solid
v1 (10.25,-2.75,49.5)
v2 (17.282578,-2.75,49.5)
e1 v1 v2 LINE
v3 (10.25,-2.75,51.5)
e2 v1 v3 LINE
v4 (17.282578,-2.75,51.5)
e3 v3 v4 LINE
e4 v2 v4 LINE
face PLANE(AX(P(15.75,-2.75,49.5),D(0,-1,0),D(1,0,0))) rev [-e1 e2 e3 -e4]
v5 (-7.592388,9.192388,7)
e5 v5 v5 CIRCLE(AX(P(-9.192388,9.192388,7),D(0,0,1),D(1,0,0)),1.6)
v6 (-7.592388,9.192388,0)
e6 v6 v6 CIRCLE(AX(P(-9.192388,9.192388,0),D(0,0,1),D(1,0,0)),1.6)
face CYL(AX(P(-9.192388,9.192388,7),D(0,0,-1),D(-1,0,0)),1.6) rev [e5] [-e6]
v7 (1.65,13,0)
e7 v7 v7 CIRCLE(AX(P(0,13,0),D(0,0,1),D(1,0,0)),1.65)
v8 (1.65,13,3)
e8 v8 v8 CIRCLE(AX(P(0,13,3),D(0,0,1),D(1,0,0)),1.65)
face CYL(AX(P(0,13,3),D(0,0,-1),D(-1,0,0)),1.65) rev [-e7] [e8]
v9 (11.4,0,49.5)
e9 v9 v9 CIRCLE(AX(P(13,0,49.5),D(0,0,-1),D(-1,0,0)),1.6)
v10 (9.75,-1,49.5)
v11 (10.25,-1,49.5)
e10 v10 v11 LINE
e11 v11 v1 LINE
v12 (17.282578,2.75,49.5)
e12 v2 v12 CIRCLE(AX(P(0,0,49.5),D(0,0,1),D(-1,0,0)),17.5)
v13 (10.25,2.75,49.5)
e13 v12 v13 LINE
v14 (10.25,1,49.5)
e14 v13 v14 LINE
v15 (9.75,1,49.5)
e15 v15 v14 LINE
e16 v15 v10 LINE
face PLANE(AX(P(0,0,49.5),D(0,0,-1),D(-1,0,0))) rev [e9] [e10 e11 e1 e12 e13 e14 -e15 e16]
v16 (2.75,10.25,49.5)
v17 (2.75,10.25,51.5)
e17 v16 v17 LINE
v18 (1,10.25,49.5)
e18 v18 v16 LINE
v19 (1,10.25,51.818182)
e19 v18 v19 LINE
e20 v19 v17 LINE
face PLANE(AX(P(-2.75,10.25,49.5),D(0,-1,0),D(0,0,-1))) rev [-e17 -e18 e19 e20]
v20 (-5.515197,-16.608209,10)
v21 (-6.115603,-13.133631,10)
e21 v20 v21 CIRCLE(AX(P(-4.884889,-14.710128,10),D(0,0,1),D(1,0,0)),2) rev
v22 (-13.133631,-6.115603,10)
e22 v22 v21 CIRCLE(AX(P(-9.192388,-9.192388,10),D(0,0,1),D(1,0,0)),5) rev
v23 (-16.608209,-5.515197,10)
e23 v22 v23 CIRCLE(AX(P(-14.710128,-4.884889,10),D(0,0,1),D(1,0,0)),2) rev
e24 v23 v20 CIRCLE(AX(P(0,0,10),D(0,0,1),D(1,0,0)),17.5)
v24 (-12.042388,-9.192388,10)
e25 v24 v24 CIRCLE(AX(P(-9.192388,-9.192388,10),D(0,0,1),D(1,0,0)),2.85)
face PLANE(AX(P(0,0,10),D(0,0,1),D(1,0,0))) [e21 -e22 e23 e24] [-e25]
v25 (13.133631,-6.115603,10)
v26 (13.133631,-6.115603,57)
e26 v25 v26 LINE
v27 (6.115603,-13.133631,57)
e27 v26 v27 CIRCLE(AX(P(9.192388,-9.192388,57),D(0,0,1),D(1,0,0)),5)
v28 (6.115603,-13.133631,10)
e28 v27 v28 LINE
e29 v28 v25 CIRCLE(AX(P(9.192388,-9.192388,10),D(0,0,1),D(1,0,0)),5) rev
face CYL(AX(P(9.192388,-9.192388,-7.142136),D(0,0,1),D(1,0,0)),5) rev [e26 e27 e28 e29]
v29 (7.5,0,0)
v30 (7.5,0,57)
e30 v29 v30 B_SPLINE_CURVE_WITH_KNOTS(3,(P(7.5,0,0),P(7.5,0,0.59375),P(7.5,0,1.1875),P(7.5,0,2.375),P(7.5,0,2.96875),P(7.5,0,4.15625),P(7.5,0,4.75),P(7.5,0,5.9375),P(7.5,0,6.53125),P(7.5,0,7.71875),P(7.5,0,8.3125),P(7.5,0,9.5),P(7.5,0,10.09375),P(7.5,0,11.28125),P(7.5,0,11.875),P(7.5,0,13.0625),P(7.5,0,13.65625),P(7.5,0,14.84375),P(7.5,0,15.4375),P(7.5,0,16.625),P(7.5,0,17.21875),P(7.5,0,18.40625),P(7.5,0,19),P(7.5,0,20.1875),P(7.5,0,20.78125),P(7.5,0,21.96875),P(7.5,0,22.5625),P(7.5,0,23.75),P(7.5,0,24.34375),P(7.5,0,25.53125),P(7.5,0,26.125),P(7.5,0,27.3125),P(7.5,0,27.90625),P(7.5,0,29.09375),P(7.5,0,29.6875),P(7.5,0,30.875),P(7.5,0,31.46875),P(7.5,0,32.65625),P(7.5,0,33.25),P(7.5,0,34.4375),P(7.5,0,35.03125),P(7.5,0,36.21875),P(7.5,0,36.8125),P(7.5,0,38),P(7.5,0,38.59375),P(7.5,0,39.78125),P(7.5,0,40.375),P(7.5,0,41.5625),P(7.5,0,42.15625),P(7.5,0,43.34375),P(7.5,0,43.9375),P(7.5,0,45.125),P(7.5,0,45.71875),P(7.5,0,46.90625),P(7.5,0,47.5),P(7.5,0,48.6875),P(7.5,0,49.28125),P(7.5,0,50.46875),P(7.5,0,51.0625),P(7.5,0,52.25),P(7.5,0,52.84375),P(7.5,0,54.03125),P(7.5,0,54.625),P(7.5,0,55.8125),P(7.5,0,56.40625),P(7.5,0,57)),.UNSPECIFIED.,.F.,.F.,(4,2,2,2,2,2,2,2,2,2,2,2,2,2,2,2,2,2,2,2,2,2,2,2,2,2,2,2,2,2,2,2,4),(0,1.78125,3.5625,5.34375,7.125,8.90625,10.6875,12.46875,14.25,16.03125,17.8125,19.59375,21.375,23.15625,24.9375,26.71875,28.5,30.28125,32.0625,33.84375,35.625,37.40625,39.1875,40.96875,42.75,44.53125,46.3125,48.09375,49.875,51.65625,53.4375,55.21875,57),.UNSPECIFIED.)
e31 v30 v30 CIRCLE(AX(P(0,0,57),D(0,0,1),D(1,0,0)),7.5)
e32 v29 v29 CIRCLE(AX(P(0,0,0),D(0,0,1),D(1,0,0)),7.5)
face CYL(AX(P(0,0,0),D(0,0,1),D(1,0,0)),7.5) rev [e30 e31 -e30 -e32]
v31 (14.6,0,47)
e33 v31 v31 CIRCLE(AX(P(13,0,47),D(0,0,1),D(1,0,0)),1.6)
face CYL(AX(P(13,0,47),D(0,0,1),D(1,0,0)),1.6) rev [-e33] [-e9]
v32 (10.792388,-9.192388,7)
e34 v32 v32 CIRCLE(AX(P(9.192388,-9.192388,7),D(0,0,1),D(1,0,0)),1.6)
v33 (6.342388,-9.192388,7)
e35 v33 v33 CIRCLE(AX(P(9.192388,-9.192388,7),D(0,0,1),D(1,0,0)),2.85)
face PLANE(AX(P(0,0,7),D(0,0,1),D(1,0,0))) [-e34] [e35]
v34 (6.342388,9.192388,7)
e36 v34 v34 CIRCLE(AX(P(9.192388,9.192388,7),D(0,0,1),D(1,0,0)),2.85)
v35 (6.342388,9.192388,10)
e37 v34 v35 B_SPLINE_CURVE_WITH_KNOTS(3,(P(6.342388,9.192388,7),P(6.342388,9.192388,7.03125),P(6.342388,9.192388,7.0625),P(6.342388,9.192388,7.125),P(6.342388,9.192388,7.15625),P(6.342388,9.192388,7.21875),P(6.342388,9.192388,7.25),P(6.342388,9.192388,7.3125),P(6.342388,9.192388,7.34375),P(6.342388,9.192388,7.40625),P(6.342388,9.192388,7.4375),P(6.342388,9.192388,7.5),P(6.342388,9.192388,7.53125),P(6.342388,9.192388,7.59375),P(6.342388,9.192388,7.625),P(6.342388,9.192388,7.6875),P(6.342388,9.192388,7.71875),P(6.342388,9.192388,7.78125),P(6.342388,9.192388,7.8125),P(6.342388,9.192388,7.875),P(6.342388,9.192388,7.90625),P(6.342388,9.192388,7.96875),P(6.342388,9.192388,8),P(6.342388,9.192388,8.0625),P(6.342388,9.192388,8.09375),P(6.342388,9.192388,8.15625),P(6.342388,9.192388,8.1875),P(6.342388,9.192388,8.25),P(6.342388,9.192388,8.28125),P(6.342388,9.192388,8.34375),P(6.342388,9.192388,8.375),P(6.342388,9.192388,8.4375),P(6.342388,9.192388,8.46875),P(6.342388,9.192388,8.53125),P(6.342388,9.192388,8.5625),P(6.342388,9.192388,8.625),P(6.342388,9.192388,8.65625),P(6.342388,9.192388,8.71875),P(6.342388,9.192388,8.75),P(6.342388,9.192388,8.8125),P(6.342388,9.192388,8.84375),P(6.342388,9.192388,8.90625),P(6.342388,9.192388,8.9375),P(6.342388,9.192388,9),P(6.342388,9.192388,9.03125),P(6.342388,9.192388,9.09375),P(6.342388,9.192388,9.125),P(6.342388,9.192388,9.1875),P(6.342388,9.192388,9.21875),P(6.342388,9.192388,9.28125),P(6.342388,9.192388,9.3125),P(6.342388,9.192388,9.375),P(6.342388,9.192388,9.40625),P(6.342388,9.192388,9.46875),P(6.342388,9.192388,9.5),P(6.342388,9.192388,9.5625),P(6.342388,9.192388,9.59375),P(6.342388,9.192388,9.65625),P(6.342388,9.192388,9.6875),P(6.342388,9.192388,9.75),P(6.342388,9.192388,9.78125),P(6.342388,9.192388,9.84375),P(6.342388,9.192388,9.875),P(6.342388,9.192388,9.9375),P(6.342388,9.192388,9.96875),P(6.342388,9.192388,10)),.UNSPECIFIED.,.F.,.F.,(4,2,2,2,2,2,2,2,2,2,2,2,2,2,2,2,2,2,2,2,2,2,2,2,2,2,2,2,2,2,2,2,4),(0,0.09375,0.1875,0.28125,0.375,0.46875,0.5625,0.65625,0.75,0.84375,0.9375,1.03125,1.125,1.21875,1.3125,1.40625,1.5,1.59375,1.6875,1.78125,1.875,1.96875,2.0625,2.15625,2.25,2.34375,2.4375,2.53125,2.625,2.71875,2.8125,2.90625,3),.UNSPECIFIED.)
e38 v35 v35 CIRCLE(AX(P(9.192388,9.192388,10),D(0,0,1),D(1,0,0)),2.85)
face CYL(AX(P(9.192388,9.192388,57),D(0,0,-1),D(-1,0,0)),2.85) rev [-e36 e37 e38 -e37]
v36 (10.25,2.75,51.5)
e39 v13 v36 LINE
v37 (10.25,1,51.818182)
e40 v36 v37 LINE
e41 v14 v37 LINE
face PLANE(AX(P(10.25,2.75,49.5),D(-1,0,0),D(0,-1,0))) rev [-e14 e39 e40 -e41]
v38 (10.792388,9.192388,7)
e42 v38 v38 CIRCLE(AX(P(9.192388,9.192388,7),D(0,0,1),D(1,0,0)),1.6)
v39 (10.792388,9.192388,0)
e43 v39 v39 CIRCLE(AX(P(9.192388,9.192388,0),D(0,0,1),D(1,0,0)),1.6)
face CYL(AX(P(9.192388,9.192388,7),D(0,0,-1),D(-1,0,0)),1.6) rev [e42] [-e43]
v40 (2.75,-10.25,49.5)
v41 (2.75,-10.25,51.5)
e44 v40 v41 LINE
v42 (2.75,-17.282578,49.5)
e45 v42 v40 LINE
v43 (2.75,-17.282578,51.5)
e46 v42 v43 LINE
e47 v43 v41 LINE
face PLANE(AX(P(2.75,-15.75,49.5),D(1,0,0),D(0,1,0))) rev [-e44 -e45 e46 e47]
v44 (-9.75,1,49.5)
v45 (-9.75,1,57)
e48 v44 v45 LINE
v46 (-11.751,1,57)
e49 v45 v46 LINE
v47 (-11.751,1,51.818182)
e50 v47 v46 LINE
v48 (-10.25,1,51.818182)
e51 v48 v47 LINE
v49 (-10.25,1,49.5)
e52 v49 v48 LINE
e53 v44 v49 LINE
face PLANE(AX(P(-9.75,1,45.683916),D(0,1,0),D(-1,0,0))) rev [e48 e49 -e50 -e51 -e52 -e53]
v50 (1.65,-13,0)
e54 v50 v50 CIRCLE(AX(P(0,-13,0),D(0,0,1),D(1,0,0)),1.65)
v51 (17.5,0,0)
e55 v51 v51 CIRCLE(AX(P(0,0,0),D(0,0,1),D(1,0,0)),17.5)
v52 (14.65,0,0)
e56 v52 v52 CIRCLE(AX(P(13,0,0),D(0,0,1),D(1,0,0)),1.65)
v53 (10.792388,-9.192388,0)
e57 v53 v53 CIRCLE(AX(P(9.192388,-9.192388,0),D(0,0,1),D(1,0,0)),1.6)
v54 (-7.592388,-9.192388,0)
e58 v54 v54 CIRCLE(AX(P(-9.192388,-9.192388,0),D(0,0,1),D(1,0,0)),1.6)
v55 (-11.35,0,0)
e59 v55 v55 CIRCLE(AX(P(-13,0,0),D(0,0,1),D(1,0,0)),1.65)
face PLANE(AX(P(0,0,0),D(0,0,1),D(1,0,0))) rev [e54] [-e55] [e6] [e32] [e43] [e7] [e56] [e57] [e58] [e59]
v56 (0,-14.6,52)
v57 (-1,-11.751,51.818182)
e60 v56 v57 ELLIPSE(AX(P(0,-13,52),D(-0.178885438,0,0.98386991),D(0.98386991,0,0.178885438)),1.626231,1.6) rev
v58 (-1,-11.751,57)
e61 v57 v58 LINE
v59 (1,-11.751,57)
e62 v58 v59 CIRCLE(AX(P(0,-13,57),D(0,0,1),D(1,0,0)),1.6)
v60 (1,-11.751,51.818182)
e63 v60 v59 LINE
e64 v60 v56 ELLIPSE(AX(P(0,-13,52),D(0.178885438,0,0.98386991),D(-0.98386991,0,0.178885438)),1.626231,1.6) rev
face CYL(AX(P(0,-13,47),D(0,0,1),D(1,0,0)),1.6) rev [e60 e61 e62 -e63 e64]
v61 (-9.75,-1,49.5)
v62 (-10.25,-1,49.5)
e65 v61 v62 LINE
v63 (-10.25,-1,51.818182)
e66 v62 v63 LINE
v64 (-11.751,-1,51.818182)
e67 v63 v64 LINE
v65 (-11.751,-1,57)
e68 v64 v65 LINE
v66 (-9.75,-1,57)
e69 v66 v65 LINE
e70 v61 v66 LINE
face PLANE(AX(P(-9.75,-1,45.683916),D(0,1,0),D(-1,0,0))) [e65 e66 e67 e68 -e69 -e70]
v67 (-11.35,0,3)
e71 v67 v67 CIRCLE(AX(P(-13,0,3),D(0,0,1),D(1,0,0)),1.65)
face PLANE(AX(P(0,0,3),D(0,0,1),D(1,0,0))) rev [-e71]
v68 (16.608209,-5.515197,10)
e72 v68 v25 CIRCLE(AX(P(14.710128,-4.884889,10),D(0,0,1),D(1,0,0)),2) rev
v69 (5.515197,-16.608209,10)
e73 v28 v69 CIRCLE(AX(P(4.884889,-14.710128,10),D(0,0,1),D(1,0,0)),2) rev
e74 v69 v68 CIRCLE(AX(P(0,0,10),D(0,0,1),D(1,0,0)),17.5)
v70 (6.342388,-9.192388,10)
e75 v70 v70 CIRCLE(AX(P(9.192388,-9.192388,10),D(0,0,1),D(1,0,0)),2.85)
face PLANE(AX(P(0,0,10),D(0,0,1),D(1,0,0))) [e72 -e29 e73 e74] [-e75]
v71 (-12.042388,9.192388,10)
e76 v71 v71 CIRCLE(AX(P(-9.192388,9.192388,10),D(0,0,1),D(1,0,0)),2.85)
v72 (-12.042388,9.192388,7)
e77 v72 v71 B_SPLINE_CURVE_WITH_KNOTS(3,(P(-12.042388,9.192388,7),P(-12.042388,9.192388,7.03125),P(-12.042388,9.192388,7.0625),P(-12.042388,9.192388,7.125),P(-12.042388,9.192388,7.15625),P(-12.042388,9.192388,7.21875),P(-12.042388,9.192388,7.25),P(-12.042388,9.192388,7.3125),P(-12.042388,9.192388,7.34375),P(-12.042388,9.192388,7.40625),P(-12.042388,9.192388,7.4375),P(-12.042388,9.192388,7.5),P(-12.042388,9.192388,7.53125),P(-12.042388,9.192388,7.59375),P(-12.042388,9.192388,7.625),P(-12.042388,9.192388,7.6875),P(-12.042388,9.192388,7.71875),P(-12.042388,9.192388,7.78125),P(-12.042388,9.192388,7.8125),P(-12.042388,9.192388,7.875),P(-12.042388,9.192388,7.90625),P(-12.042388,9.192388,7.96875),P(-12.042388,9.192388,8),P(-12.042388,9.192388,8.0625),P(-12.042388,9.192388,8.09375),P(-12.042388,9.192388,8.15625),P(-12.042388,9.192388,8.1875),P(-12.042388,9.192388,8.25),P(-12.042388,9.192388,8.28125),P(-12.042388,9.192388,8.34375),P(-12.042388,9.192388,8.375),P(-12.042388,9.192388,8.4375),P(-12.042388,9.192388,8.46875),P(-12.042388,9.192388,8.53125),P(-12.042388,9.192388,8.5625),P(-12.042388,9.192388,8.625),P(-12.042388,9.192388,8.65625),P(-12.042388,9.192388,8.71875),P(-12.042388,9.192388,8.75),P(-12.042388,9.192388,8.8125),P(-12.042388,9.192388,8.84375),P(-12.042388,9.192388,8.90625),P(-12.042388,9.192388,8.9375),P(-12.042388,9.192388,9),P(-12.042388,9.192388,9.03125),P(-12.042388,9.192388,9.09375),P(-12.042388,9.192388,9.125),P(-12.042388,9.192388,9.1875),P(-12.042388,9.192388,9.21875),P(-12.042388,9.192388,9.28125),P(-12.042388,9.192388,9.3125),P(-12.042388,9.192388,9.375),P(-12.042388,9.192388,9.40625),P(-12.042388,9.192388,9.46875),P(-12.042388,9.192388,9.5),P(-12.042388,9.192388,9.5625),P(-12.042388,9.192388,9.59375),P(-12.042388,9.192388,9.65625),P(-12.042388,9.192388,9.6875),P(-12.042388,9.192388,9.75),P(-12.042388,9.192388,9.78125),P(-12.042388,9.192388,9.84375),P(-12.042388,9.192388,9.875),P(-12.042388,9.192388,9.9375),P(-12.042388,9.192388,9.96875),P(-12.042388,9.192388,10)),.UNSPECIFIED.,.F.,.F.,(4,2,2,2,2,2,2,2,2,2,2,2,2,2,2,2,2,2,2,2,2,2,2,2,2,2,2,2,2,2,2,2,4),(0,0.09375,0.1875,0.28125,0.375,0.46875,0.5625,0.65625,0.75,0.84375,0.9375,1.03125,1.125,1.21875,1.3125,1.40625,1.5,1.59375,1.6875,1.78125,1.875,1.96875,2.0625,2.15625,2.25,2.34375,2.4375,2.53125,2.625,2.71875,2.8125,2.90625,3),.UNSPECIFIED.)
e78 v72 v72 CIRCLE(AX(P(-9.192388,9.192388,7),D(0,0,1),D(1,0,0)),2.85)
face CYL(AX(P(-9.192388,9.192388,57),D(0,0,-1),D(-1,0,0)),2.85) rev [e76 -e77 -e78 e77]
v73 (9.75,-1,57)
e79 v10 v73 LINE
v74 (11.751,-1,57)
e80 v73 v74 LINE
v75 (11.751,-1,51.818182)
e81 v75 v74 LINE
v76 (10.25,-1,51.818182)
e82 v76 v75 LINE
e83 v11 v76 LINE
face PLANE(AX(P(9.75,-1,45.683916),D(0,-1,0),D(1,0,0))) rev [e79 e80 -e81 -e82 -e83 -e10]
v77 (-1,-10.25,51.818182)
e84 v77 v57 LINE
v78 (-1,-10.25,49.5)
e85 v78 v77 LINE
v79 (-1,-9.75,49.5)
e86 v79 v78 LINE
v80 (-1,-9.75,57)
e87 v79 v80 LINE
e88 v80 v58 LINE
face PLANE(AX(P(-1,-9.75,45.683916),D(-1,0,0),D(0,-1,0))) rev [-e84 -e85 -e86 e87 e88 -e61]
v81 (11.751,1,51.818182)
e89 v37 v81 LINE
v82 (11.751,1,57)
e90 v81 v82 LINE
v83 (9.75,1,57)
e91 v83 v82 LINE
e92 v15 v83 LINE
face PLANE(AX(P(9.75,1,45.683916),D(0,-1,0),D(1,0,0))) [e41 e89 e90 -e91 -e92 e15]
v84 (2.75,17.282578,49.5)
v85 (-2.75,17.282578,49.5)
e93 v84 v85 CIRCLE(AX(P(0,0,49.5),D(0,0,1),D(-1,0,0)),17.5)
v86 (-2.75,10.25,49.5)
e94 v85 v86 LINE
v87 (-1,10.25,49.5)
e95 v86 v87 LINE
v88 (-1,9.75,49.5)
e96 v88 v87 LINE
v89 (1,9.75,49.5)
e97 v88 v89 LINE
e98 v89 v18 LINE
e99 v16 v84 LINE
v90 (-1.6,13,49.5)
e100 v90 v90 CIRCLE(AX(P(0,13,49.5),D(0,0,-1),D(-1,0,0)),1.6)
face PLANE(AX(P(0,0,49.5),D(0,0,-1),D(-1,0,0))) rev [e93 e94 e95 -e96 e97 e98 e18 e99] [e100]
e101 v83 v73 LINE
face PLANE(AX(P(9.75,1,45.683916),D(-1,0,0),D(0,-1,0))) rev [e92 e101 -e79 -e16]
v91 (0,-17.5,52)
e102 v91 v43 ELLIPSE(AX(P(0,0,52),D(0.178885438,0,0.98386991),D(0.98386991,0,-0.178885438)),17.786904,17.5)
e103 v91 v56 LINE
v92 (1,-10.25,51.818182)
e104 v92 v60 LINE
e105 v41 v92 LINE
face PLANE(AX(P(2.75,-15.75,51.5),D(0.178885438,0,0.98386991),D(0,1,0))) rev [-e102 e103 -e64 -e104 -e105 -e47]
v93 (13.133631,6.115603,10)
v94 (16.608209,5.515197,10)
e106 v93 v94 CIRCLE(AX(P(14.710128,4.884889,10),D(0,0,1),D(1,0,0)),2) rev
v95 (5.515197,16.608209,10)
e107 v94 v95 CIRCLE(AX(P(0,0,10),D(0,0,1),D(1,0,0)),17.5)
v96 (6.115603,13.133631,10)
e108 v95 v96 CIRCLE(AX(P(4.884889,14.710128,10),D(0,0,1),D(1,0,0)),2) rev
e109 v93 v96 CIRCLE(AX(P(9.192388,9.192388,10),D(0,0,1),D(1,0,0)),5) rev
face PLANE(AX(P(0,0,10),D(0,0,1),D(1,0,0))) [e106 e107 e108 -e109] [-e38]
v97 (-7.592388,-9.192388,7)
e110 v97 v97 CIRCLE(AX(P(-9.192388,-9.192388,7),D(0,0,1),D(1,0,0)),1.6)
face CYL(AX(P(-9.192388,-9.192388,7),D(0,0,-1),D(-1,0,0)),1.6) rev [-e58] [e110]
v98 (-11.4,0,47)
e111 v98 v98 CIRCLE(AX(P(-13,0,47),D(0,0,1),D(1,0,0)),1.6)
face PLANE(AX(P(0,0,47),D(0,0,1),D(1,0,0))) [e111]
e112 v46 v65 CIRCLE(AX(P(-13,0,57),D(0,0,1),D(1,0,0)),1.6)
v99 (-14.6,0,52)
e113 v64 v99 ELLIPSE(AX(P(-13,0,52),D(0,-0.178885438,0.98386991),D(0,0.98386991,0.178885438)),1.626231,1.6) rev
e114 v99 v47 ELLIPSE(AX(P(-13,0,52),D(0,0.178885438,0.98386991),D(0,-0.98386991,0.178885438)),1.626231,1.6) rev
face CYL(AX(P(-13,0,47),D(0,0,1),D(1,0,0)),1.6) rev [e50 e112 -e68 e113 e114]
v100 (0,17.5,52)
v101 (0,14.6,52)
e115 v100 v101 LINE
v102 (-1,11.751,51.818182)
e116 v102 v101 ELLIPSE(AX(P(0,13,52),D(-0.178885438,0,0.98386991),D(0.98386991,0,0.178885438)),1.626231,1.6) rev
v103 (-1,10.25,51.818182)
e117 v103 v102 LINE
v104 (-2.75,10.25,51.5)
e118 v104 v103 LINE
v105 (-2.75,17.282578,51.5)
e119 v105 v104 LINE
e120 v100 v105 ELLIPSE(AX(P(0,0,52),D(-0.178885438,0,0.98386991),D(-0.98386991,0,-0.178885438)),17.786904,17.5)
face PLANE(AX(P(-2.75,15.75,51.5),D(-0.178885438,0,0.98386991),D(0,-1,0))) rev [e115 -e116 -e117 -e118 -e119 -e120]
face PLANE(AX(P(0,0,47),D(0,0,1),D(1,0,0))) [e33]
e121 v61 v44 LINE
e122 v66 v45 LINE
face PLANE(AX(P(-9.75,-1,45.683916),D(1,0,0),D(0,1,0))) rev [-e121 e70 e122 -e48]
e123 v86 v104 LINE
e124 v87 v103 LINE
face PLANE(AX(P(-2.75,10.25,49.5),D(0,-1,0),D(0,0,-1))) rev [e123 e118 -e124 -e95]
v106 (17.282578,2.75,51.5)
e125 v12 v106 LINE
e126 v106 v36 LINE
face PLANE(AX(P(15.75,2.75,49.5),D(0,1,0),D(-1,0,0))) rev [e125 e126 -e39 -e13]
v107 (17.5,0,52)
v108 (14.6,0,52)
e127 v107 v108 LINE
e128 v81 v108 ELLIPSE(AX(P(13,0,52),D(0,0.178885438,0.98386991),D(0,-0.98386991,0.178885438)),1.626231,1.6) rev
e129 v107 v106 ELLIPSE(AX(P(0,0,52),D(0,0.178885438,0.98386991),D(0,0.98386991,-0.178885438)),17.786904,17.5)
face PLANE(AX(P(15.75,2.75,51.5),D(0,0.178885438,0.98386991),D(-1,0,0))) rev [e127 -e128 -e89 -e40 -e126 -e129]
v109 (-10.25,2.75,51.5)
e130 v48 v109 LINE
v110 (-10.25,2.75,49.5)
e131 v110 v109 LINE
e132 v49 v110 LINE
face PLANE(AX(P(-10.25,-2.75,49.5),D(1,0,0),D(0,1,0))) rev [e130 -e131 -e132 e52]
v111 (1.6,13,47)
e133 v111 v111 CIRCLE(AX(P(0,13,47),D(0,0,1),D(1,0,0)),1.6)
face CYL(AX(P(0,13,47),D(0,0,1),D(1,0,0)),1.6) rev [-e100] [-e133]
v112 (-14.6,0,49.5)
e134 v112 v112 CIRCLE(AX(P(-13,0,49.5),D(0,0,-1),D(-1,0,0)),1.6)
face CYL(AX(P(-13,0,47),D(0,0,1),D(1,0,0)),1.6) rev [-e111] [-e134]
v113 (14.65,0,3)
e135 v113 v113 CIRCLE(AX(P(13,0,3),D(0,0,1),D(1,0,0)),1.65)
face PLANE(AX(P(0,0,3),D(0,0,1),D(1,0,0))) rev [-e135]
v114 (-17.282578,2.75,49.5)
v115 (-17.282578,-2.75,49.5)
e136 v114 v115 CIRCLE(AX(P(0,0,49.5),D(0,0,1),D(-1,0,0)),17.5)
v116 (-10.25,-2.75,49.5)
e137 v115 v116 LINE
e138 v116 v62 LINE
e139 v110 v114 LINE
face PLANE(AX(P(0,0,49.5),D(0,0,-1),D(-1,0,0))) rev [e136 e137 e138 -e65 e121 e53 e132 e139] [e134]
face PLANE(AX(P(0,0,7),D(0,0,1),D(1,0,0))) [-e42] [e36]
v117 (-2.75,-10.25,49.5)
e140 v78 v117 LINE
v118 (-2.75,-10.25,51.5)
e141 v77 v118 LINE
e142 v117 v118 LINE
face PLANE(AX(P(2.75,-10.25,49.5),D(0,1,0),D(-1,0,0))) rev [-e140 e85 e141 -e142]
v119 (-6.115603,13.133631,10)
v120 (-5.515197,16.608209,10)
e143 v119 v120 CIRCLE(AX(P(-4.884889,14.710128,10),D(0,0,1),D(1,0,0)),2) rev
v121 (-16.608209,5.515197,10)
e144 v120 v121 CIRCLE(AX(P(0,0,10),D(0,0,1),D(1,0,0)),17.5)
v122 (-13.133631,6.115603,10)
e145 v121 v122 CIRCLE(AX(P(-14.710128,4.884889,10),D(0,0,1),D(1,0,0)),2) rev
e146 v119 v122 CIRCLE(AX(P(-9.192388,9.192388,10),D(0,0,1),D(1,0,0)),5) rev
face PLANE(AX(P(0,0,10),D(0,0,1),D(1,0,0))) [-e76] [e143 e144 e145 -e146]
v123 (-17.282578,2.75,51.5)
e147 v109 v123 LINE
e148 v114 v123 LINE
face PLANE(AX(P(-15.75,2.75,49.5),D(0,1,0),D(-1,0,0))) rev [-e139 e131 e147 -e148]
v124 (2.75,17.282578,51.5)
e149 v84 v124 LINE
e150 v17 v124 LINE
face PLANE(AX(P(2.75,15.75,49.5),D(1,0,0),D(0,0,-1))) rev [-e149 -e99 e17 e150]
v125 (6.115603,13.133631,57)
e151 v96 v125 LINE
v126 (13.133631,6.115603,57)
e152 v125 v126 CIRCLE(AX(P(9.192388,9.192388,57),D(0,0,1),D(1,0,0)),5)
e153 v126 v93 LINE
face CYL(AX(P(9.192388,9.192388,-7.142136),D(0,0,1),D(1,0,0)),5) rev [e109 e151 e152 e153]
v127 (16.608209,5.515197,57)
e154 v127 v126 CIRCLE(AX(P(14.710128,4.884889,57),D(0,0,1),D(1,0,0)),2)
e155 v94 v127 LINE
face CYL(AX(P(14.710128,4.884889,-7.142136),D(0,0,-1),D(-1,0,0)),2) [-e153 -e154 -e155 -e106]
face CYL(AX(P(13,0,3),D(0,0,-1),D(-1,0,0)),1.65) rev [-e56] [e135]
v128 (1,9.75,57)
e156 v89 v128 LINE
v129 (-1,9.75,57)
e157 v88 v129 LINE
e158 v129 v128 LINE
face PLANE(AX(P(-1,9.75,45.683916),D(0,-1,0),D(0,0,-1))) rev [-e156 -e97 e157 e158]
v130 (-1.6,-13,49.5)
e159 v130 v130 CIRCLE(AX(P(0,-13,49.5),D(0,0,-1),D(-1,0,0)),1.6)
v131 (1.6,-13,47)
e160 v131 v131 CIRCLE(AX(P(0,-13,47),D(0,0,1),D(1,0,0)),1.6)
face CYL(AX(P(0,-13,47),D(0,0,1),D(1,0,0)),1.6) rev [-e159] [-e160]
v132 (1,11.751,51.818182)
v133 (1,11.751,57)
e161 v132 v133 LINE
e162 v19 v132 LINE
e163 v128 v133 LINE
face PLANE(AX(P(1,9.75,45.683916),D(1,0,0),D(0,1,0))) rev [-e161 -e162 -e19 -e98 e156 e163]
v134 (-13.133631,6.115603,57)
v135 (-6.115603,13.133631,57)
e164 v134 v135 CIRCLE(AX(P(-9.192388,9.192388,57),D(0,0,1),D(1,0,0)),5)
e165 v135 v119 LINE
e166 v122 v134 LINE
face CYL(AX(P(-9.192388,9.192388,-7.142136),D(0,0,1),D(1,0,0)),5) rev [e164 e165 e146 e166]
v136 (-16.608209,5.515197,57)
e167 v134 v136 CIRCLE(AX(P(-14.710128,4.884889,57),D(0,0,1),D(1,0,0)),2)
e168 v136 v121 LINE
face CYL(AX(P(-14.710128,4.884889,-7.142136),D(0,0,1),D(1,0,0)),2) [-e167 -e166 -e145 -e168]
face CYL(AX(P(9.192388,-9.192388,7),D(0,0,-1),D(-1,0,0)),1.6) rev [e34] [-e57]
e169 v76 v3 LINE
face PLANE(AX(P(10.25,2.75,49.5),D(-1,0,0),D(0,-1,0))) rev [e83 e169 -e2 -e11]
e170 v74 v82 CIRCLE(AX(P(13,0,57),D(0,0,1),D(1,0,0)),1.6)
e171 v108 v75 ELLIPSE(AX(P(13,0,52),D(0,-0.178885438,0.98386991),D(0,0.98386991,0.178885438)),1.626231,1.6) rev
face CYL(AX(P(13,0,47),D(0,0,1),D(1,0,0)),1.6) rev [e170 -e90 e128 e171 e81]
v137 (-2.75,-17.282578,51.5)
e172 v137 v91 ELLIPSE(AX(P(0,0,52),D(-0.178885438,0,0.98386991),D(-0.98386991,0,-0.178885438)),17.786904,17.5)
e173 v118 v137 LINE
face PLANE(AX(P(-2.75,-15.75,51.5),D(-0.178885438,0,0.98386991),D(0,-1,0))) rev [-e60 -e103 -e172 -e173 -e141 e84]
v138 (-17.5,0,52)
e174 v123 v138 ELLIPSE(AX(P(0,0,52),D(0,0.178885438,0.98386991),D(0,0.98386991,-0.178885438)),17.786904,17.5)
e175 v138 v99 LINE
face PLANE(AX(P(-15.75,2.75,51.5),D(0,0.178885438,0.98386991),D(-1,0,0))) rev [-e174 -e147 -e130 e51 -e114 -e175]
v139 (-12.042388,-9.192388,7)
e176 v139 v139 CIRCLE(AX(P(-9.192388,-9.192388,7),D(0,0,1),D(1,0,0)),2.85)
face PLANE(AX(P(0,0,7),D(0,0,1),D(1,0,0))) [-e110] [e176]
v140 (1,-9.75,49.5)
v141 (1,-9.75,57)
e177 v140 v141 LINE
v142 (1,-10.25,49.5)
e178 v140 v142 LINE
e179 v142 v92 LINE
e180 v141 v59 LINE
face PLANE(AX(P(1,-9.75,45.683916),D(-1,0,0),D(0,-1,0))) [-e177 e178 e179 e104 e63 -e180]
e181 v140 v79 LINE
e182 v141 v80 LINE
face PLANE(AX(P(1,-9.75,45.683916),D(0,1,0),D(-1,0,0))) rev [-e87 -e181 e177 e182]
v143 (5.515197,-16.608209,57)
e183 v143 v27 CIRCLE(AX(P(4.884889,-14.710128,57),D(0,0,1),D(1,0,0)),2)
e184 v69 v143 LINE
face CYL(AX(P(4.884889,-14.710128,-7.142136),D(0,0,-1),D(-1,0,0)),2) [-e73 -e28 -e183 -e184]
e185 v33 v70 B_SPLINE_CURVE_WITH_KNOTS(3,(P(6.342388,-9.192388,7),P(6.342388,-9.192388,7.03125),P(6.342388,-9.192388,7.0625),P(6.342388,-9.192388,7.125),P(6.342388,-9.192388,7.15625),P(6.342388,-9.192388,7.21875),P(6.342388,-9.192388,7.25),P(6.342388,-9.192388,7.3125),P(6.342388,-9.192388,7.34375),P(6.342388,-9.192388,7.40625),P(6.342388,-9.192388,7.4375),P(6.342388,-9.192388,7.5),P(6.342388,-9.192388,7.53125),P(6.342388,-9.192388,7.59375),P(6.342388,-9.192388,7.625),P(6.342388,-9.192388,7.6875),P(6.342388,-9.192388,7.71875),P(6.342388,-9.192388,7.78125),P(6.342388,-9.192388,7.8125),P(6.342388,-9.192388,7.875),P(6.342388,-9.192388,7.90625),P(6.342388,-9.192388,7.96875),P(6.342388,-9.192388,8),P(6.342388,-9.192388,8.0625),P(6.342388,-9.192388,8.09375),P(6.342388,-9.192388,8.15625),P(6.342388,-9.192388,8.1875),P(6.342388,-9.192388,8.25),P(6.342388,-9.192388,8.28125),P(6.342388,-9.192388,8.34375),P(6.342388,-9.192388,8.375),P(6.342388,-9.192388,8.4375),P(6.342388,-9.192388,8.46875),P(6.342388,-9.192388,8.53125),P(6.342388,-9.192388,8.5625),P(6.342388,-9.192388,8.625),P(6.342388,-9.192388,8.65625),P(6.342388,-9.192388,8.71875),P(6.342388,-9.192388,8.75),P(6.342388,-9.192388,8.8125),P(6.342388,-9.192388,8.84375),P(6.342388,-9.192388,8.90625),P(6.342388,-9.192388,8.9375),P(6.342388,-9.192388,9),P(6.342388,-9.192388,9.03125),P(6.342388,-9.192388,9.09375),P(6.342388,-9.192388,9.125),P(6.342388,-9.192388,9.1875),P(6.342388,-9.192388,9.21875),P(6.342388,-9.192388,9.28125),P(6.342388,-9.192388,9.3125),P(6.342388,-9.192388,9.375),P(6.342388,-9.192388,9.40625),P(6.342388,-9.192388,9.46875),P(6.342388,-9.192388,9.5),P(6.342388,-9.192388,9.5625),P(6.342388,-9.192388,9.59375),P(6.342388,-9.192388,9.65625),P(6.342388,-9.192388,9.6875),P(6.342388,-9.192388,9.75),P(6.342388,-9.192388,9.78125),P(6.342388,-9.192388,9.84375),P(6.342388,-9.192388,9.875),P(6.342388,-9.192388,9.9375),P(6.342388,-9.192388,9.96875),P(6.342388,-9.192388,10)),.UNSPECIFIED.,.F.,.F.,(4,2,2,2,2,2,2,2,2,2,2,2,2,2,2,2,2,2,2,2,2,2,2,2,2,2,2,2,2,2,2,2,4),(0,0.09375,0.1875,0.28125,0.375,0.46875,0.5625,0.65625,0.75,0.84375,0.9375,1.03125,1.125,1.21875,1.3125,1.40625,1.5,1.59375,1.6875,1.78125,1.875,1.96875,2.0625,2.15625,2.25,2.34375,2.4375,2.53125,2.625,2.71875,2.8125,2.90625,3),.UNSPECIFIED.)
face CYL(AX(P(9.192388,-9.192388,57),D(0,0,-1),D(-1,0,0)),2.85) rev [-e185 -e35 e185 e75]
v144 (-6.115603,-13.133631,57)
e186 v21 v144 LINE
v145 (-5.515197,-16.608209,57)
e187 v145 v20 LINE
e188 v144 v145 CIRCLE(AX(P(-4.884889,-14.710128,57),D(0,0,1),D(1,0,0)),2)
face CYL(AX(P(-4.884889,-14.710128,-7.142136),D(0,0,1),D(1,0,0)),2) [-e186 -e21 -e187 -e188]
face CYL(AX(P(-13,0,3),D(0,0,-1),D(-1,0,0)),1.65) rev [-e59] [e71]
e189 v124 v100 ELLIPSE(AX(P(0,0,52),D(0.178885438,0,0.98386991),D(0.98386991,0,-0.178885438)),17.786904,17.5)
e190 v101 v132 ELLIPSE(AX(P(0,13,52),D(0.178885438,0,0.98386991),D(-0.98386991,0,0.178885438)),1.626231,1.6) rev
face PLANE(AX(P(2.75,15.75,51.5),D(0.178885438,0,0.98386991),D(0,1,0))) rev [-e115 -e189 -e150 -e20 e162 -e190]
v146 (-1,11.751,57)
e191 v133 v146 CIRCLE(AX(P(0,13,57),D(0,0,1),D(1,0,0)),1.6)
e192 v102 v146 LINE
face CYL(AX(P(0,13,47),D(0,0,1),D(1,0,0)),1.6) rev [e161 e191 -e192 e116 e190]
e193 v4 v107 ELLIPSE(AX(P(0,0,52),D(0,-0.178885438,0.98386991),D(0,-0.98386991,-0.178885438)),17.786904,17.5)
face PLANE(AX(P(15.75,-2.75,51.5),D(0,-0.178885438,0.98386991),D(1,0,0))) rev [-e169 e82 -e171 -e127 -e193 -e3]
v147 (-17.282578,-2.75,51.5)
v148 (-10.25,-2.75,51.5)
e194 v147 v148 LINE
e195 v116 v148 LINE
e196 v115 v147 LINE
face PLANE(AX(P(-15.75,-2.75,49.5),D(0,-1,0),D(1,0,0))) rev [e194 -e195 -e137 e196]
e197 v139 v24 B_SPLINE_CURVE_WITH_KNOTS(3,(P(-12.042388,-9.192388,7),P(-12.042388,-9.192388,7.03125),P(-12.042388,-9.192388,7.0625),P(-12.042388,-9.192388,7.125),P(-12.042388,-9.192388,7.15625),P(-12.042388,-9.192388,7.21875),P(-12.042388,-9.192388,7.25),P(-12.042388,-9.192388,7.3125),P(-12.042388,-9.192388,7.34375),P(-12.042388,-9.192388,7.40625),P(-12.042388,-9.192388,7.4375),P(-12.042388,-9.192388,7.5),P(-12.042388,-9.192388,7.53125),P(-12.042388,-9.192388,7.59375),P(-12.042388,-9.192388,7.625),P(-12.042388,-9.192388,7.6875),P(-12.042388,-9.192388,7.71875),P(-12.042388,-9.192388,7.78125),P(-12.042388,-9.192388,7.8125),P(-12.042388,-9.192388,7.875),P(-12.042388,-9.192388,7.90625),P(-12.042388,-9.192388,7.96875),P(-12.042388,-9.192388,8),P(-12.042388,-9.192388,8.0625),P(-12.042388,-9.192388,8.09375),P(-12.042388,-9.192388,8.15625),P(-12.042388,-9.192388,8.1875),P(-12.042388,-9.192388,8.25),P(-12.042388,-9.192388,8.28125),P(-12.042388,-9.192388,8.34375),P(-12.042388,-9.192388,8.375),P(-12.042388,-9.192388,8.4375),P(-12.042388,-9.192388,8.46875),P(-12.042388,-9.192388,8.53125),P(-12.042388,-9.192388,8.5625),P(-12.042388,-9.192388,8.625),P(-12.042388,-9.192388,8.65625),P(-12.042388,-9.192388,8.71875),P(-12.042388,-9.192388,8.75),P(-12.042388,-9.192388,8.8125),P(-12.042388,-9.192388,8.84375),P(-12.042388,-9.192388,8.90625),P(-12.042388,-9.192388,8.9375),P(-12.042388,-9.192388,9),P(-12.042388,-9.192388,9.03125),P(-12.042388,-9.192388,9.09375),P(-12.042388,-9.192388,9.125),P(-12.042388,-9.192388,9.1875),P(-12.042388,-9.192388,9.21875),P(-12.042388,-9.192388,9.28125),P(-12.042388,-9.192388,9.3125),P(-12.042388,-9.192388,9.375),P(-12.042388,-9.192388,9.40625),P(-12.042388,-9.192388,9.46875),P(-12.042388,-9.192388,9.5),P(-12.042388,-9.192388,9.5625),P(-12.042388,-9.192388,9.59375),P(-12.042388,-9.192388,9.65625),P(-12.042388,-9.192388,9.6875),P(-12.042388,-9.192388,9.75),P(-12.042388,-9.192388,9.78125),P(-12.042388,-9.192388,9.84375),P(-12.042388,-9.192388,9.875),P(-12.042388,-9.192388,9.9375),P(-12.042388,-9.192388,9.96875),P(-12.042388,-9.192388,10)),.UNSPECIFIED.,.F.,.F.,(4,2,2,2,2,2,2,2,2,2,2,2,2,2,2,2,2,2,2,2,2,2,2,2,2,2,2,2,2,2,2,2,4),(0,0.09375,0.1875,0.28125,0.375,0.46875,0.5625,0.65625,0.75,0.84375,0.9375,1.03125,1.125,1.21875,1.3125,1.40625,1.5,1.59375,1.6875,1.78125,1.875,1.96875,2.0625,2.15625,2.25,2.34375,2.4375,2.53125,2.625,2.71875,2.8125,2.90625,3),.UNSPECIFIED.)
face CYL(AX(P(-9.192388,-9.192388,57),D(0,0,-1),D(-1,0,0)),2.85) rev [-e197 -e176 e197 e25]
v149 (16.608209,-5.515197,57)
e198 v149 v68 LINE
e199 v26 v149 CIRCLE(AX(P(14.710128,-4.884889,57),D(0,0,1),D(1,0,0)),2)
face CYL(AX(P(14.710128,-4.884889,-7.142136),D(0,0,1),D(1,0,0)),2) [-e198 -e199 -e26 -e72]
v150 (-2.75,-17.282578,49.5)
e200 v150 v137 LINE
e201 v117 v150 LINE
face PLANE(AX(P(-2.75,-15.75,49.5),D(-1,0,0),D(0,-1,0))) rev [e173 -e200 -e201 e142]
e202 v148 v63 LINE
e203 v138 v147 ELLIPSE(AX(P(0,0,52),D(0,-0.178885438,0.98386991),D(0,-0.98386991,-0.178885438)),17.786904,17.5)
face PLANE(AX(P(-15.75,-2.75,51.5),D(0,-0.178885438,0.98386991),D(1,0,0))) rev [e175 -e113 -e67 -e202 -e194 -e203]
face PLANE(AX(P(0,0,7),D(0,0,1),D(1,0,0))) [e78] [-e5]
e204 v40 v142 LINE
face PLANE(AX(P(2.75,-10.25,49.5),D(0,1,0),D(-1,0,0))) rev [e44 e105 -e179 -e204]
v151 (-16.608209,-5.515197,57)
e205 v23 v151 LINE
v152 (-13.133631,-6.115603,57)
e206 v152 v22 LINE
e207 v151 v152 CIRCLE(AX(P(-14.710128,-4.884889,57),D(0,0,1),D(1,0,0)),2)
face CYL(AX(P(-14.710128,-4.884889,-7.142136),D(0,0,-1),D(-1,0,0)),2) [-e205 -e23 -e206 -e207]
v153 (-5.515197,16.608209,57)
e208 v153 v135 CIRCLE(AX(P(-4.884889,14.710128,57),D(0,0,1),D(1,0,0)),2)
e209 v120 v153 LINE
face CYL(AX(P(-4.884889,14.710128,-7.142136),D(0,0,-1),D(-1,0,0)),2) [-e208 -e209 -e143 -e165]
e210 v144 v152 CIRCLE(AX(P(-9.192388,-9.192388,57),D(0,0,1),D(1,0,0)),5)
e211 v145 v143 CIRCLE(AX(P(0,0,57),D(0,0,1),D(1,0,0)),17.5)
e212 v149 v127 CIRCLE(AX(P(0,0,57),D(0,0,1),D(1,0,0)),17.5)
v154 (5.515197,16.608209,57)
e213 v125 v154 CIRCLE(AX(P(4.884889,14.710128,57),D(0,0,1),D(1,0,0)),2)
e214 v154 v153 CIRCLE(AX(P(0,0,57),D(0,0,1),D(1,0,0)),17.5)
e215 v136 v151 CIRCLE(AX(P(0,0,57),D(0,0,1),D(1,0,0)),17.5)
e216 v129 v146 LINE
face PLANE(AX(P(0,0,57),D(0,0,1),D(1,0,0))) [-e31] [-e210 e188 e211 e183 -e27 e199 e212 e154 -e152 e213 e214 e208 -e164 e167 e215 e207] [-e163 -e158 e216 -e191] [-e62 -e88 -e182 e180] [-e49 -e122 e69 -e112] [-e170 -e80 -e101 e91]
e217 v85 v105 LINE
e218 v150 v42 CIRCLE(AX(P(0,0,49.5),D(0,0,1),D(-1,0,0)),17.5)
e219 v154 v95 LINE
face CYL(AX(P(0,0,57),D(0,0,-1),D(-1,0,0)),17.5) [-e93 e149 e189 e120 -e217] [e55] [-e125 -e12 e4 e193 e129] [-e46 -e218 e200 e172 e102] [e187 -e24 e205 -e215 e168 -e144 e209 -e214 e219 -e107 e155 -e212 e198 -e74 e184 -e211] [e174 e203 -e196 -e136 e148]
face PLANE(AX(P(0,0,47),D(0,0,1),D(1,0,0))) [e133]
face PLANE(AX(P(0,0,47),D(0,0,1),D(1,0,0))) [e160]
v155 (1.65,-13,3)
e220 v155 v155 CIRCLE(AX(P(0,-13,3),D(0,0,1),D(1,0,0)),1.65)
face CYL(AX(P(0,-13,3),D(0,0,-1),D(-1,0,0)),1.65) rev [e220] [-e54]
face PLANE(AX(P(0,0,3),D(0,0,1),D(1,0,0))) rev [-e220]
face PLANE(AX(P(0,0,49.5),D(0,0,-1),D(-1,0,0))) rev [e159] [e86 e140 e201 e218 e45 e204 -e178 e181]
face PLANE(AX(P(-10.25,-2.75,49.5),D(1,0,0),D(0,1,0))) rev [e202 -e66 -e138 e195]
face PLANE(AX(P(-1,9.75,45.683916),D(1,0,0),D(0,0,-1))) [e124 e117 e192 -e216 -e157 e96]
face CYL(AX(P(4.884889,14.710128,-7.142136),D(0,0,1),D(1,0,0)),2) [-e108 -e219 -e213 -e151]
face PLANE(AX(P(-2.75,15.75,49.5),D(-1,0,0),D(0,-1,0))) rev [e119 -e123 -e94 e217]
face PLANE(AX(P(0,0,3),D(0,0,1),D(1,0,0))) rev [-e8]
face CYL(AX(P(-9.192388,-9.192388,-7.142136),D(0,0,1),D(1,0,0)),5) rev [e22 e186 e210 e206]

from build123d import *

# Parameters (mm, degrees)
SKETCH1_R           = 17.5
SKETCH1_R_2         = 2.85
SKETCH1_R_3         = 1.65
BOSS_EXTRUDE1_DEPTH = 57
SKETCH1_3_R         = 2.85
SKETCH1_3_R_2       = 1.6
BOSS_EXTRUDE2_DEPTH = 7
SKETCH2_R           = 5
CUT_EXTRUDE1_DEPTH  = 47
FILLET1_R           = 2
CUT_EXTRUDE2_START  = -7.5
SKETCH3_R           = 1.6
CUT_EXTRUDE2_DEPTH  = 2.5
CUT_EXTRUDE3_START  = -10
SKETCH3_2_R         = 1.6
CUT_EXTRUDE3_DEPTH  = 10
CHAMFER1_SIZE       = 2.75
CHAMFER1_SIZE_2     = 0.5
SKETCH4_R           = 7.5
CUT_EXTRUDE4_DEPTH  = 63.140968921
SKETCH1_4_R         = 1.65
CUT_EXTRUDE5_DEPTH  = 3
CUT_EXTRUDE6_REACH  = 64.141
SKETCH5_W           = 2
SKETCH5_H           = 3.25
SKETCH5_W_2         = 3.25
SKETCH5_H_2         = 2


with BuildPart() as part:
    # Sketch1 → Boss-Extrude1 (new body)
    # profile 1 of 5: a face of its own
    with BuildSketch(Plane(origin=(0, 0, 0), x_dir=(0, 1, 0), z_dir=(0, 0, 1))):
        with Locations(Location((0, 0, 0), (0, 0, 90))):
            Circle(SKETCH1_R)
        with Locations(Location((-9.192388155, 9.192388155, 0), (0, 0, 90))):
            Circle(SKETCH1_R_2, mode=Mode.SUBTRACT)
        with Locations(Location((-9.192388155, -9.192388155, 0), (0, 0, 90))):
            Circle(SKETCH1_R_2, mode=Mode.SUBTRACT)
        with Locations(Location((9.192388155, -9.192388155, 0), (0, 0, 90))):
            Circle(SKETCH1_R_2, mode=Mode.SUBTRACT)
        with Locations(Location((9.192388155, 9.192388155, 0), (0, 0, 90))):
            Circle(SKETCH1_R_2, mode=Mode.SUBTRACT)
    # profile 2 of 5: a face of its own
    with BuildSketch(Plane(origin=(0, 0, 0), x_dir=(0, 1, 0), z_dir=(0, 0, 1))):
        with Locations((0, 13)):
            Circle(SKETCH1_R_3)
    # profile 3 of 5: a face of its own
    with BuildSketch(Plane(origin=(0, 0, 0), x_dir=(0, 1, 0), z_dir=(0, 0, 1))):
        with Locations((-13, 0)):
            Circle(SKETCH1_R_3)
    # profile 4 of 5: a face of its own
    with BuildSketch(Plane(origin=(0, 0, 0), x_dir=(0, 1, 0), z_dir=(0, 0, 1))):
        with Locations((0, -13)):
            Circle(SKETCH1_R_3)
    # profile 5 of 5: a face of its own
    with BuildSketch(Plane(origin=(0, 0, 0), x_dir=(0, 1, 0), z_dir=(0, 0, 1))):
        with Locations((13, 0)):
            Circle(SKETCH1_R_3)
    extrude(amount=BOSS_EXTRUDE1_DEPTH)

    # Sketch1<3> → Boss-Extrude2 (add)
    # profile 1 of 4: a face of its own
    with BuildSketch(Plane(origin=(0, 0, 0), x_dir=(0, 1, 0), z_dir=(0, 0, 1))):
        with Locations(Location((-9.192388155, -9.192388155, 0), (0, 0, 90))):
            Circle(SKETCH1_3_R)
        with Locations(Location((-9.192388155, -9.192388155, 0), (0, 0, 270))):
            Circle(SKETCH1_3_R_2, mode=Mode.SUBTRACT)
    # profile 2 of 4: a face of its own
    with BuildSketch(Plane(origin=(0, 0, 0), x_dir=(0, 1, 0), z_dir=(0, 0, 1))):
        with Locations(Location((-9.192388155, 9.192388155, 0), (0, 0, 90))):
            Circle(SKETCH1_3_R)
        with Locations(Location((-9.192388155, 9.192388155, 0), (0, 0, 270))):
            Circle(SKETCH1_3_R_2, mode=Mode.SUBTRACT)
    # profile 3 of 4: a face of its own
    with BuildSketch(Plane(origin=(0, 0, 0), x_dir=(0, 1, 0), z_dir=(0, 0, 1))):
        with Locations(Location((9.192388155, -9.192388155, 0), (0, 0, 90))):
            Circle(SKETCH1_3_R)
        with Locations(Location((9.192388155, -9.192388155, 0), (0, 0, 270))):
            Circle(SKETCH1_3_R_2, mode=Mode.SUBTRACT)
    # profile 4 of 4: a face of its own
    with BuildSketch(Plane(origin=(0, 0, 0), x_dir=(0, 1, 0), z_dir=(0, 0, 1))):
        with Locations(Location((9.192388155, 9.192388155, 0), (0, 0, 90))):
            Circle(SKETCH1_3_R)
        with Locations(Location((9.192388155, 9.192388155, 0), (0, 0, 270))):
            Circle(SKETCH1_3_R_2, mode=Mode.SUBTRACT)
    extrude(amount=BOSS_EXTRUDE2_DEPTH)

    # Sketch2 → Cut-Extrude1 (cut)
    with BuildSketch(Plane.XY.offset(57)):
        with Locations((-9.192388155, 9.192388155)):
            Circle(SKETCH2_R)
        with Locations((9.192388155, 9.192388155)):
            Circle(SKETCH2_R)
        with Locations((9.192388155, -9.192388155)):
            Circle(SKETCH2_R)
        with Locations((-9.192388155, -9.192388155)):
            Circle(SKETCH2_R)
    extrude(amount=-CUT_EXTRUDE1_DEPTH, mode=Mode.SUBTRACT)

    # Fillet1
    fillet1_edges = [part.edges().sort_by_distance(p)[0] for p in [
        (-14.028560913, -10.46181049, 33.5),
        (-10.46181049, -14.028560913, 33.5),
        (10.46181049, -14.028560913, 33.5),
        (14.028560913, -10.46181049, 33.5),
        (14.028560913, 10.46181049, 33.5),
        (10.46181049, 14.028560913, 33.5),
        (-10.46181049, 14.028560913, 33.5),
        (-14.028560913, 10.46181049, 33.5),
    ]]
    fillet(fillet1_edges, radius=FILLET1_R)

    # Sketch3 → Cut-Extrude2 (cut)
    # profile 1 of 4: a face of its own
    with BuildSketch(Plane.XY.offset(57).offset(CUT_EXTRUDE2_START)):
        with BuildLine():
            Line((-2.75, 15.75), (-2.75, 17.282577933))
            ThreePointArc((-2.75, 17.282577933), (0, 17.5), (2.75, 17.282577933))
            Line((2.75, 17.282577933), (2.75, 15.75))
            Line((2.75, 15.75), (2.75, 10.25))
            Line((2.75, 10.25), (-2.75, 10.25))
            Line((-2.75, 10.25), (-2.75, 15.75))
        make_face()
        with Locations((0, 13)):
            Circle(SKETCH3_R, mode=Mode.SUBTRACT)
    # profile 2 of 4: a face of its own
    with BuildSketch(Plane.XY.offset(57).offset(CUT_EXTRUDE2_START)):
        with BuildLine():
            Line((15.75, -2.75), (10.25, -2.75))
            Line((10.25, -2.75), (10.25, 2.75))
            Line((10.25, 2.75), (15.75, 2.75))
            Line((15.75, 2.75), (17.282577933, 2.75))
            ThreePointArc((17.282577933, 2.75), (17.5, 0), (17.282577933, -2.75))
            Line((17.282577933, -2.75), (15.75, -2.75))
        make_face()
        with Locations((13, 0)):
            Circle(SKETCH3_R, mode=Mode.SUBTRACT)
    # profile 3 of 4: a face of its own
    with BuildSketch(Plane.XY.offset(57).offset(CUT_EXTRUDE2_START)):
        with BuildLine():
            Line((-2.75, -15.75), (-2.75, -10.25))
            Line((-2.75, -10.25), (2.75, -10.25))
            Line((2.75, -10.25), (2.75, -15.75))
            Line((2.75, -15.75), (2.75, -17.282577933))
            ThreePointArc((2.75, -17.282577933), (0, -17.5), (-2.75, -17.282577933))
            Line((-2.75, -17.282577933), (-2.75, -15.75))
        make_face()
        with Locations((0, -13)):
            Circle(SKETCH3_R, mode=Mode.SUBTRACT)
    # profile 4 of 4: a face of its own
    with BuildSketch(Plane.XY.offset(57).offset(CUT_EXTRUDE2_START)):
        with BuildLine():
            Line((-15.75, 2.75), (-10.25, 2.75))
            Line((-10.25, 2.75), (-10.25, -2.75))
            Line((-10.25, -2.75), (-15.75, -2.75))
            Line((-15.75, -2.75), (-17.282577933, -2.75))
            ThreePointArc((-17.282577933, -2.75), (-17.5, 0), (-17.282577933, 2.75))
            Line((-17.282577933, 2.75), (-15.75, 2.75))
        make_face()
        with Locations((-13, 0)):
            Circle(SKETCH3_R, mode=Mode.SUBTRACT)
    extrude(amount=CUT_EXTRUDE2_DEPTH, mode=Mode.SUBTRACT)

    # Sketch3<2> → Cut-Extrude3 (cut)
    with BuildSketch(Plane.XY.offset(57).offset(CUT_EXTRUDE3_START)):
        with Locations((-13, 0)):
            Circle(SKETCH3_2_R)
        with Locations((0, 13)):
            Circle(SKETCH3_2_R)
        with Locations((13, 0)):
            Circle(SKETCH3_2_R)
        with Locations((0, -13)):
            Circle(SKETCH3_2_R)
    extrude(amount=CUT_EXTRUDE3_DEPTH, mode=Mode.SUBTRACT)

    # Chamfer1
    # the kernel refuses this chamfer: 2.75, 0.5 mm, written as the material it adds along each edge
    with BuildSketch(Plane(origin=(-3.104266441, -2.75, 52), x_dir=(1.0355932807417332e-14, 0.9999763028084744, 0.006884317068104265), z_dir=(-1, 0, 0))) as chamfer1_piece_1_section:
        Polygon((CHAMFER1_SIZE * 0.999976302808, CHAMFER1_SIZE * 0.0068843170681), (-CHAMFER1_SIZE_2 * 0.0068843170681, CHAMFER1_SIZE_2 * 0.999976302808), (0, 0), align=None)
    chamfer1_piece_1 = extrude(amount=21.324045051, mode=Mode.PRIVATE)
    chamfer1_piece_1 = chamfer1_piece_1 & Plane(origin=(0, 0, 51.863927103), x_dir=(-1, 0, 0), z_dir=(0, 0, -1)) * Cylinder(17.5, 54, mode=Mode.PRIVATE)
    chamfer1_piece_1 = chamfer1_piece_1 - Plane(origin=(-13, 0, 51.863927103), x_dir=(1, 0, 0), z_dir=(0, 0, -1)) * Cylinder(1.6, 54, mode=Mode.PRIVATE)
    add(chamfer1_piece_1)
    with BuildSketch(Plane(origin=(-24.428311492, 2.75, 52), x_dir=(-1.048222467092242e-14, -0.9999763028084744, 0.006884317068104265), z_dir=(1, 0, 0))) as chamfer1_piece_2_section:
        Polygon((CHAMFER1_SIZE * 0.999976302808, CHAMFER1_SIZE * 0.0068843170681), (-CHAMFER1_SIZE_2 * 0.0068843170681, CHAMFER1_SIZE_2 * 0.999976302808), (0, 0), align=None)
    chamfer1_piece_2 = extrude(amount=21.324045051, mode=Mode.PRIVATE)
    chamfer1_piece_2 = chamfer1_piece_2 & Plane(origin=(0, 0, 51.852070579), x_dir=(-1, 0, 0), z_dir=(0, 0, -1)) * Cylinder(17.5, 54, mode=Mode.PRIVATE)
    chamfer1_piece_2 = chamfer1_piece_2 - Plane(origin=(-13, 0, 51.852070579), x_dir=(1, 0, 0), z_dir=(0, 0, -1)) * Cylinder(1.6, 54, mode=Mode.PRIVATE)
    add(chamfer1_piece_2)
    with BuildSketch(Plane(origin=(-2.75, 3.104266441, 52), x_dir=(0.9999763028084744, 0, 0.006884317068104265), z_dir=(0, 1, 0))) as chamfer1_piece_3_section:
        Polygon((CHAMFER1_SIZE * 0.999976302808, CHAMFER1_SIZE * 0.0068843170681), (-CHAMFER1_SIZE_2 * 0.0068843170681, CHAMFER1_SIZE_2 * 0.999976302808), (0, 0), align=None)
    chamfer1_piece_3 = extrude(amount=21.324045051, mode=Mode.PRIVATE)
    chamfer1_piece_3 = chamfer1_piece_3 & Plane(origin=(0, 0, 51.863927103), x_dir=(-1, 0, 0), z_dir=(0, 0, -1)) * Cylinder(17.5, 54, mode=Mode.PRIVATE)
    chamfer1_piece_3 = chamfer1_piece_3 - Plane(origin=(0, 13, 51.863927103), x_dir=(1, 0, 0), z_dir=(0, 0, -1)) * Cylinder(1.6, 54, mode=Mode.PRIVATE)
    add(chamfer1_piece_3)
    with BuildSketch(Plane(origin=(2.75, 24.428311492, 52), x_dir=(0.20388124945923355, 0, -0.9789956262001082), z_dir=(0, -1, 0))) as chamfer1_piece_4_section:
        Polygon((CHAMFER1_SIZE_2 * 0.9789956262, -CHAMFER1_SIZE_2 * 0.203881249459), (-CHAMFER1_SIZE * 0.203881249459, -CHAMFER1_SIZE * 0.9789956262), (0, 0), align=None)
    chamfer1_piece_4 = extrude(amount=21.324045051, mode=Mode.PRIVATE)
    chamfer1_piece_4 = chamfer1_piece_4 & Plane(origin=(0, 0, 51.852070749), x_dir=(-1, 0, 0), z_dir=(0, 0, -1)) * Cylinder(17.5, 54, mode=Mode.PRIVATE)
    chamfer1_piece_4 = chamfer1_piece_4 - Plane(origin=(0, 13, 51.852070749), x_dir=(1, 0, 0), z_dir=(0, 0, -1)) * Cylinder(1.6, 54, mode=Mode.PRIVATE)
    add(chamfer1_piece_4)
    with BuildSketch(Plane(origin=(3.104266441, 2.75, 52), x_dir=(-3.409880314637416e-15, -0.9999763028084744, 0.006884317068104265), z_dir=(1, 0, 0))) as chamfer1_piece_5_section:
        Polygon((CHAMFER1_SIZE * 0.999976302808, CHAMFER1_SIZE * 0.0068843170681), (-CHAMFER1_SIZE_2 * 0.0068843170681, CHAMFER1_SIZE_2 * 0.999976302808), (0, 0), align=None)
    chamfer1_piece_5 = extrude(amount=21.324045051, mode=Mode.PRIVATE)
    chamfer1_piece_5 = chamfer1_piece_5 & Plane(origin=(0, 0, 51.863927103), x_dir=(-1, 0, 0), z_dir=(0, 0, -1)) * Cylinder(17.5, 54, mode=Mode.PRIVATE)
    chamfer1_piece_5 = chamfer1_piece_5 - Plane(origin=(13, 0, 51.863927103), x_dir=(1, 0, 0), z_dir=(0, 0, -1)) * Cylinder(1.6, 54, mode=Mode.PRIVATE)
    add(chamfer1_piece_5)
    with BuildSketch(Plane(origin=(24.428311492, -2.75, 52), x_dir=(0, -0.20388124945923355, -0.9789956262001082), z_dir=(-1, 0, 0))) as chamfer1_piece_6_section:
        Polygon((CHAMFER1_SIZE_2 * 0.9789956262, -CHAMFER1_SIZE_2 * 0.203881249459), (-CHAMFER1_SIZE * 0.203881249459, -CHAMFER1_SIZE * 0.9789956262), (0, 0), align=None)
    chamfer1_piece_6 = extrude(amount=21.324045051, mode=Mode.PRIVATE)
    chamfer1_piece_6 = chamfer1_piece_6 & Plane(origin=(0, 0, 51.852070888), x_dir=(-1, 0, 0), z_dir=(0, 0, -1)) * Cylinder(17.5, 54, mode=Mode.PRIVATE)
    chamfer1_piece_6 = chamfer1_piece_6 - Plane(origin=(13, 0, 51.852070888), x_dir=(1, 0, 0), z_dir=(0, 0, -1)) * Cylinder(1.6, 54, mode=Mode.PRIVATE)
    add(chamfer1_piece_6)
    with BuildSketch(Plane(origin=(2.75, -3.104266441, 52), x_dir=(-0.9999763028084744, 6.88290656102737e-15, 0.006884317068104265), z_dir=(0, -1, 0))) as chamfer1_piece_7_section:
        Polygon((CHAMFER1_SIZE * 0.999976302808, CHAMFER1_SIZE * 0.0068843170681), (-CHAMFER1_SIZE_2 * 0.0068843170681, CHAMFER1_SIZE_2 * 0.999976302808), (0, 0), align=None)
    chamfer1_piece_7 = extrude(amount=21.324045051, mode=Mode.PRIVATE)
    chamfer1_piece_7 = chamfer1_piece_7 & Plane(origin=(0, 0, 51.863927103), x_dir=(-1, 0, 0), z_dir=(0, 0, -1)) * Cylinder(17.5, 54, mode=Mode.PRIVATE)
    chamfer1_piece_7 = chamfer1_piece_7 - Plane(origin=(0, -13, 51.863927103), x_dir=(1, 0, 0), z_dir=(0, 0, -1)) * Cylinder(1.6, 54, mode=Mode.PRIVATE)
    add(chamfer1_piece_7)
    with BuildSketch(Plane(origin=(-2.75, -24.428311492, 52), x_dir=(-0.20388124945923355, 1.4290779976363847e-15, -0.9789956262001082), z_dir=(0, 1, 0))) as chamfer1_piece_8_section:
        Polygon((CHAMFER1_SIZE_2 * 0.9789956262, -CHAMFER1_SIZE_2 * 0.203881249459), (-CHAMFER1_SIZE * 0.203881249459, -CHAMFER1_SIZE * 0.9789956262), (0, 0), align=None)
    chamfer1_piece_8 = extrude(amount=21.324045051, mode=Mode.PRIVATE)
    chamfer1_piece_8 = chamfer1_piece_8 & Plane(origin=(0, 0, 51.852070422), x_dir=(-1, 0, 0), z_dir=(0, 0, -1)) * Cylinder(17.5, 54, mode=Mode.PRIVATE)
    chamfer1_piece_8 = chamfer1_piece_8 - Plane(origin=(0, -13, 51.852070422), x_dir=(1, 0, 0), z_dir=(0, 0, -1)) * Cylinder(1.6, 54, mode=Mode.PRIVATE)
    add(chamfer1_piece_8)

    # Sketch4 → Cut-Extrude4 (cut, through all)
    with BuildSketch(Plane.XY.offset(57)):
        Circle(SKETCH4_R)
    extrude(amount=-CUT_EXTRUDE4_DEPTH, mode=Mode.SUBTRACT)

    # Sketch1<4> → Cut-Extrude5 (cut)
    with BuildSketch(Plane(origin=(0, 0, 0), x_dir=(0, 1, 0), z_dir=(0, 0, 1))):
        with Locations(Location((-13, 0, 0), (0, 0, 270))):
            Circle(SKETCH1_4_R)
        with Locations(Location((0, -13, 0), (0, 0, 270))):
            Circle(SKETCH1_4_R)
        with Locations(Location((13, 0, 0), (0, 0, 270))):
            Circle(SKETCH1_4_R)
        with Locations(Location((0, 13, 0), (0, 0, 270))):
            Circle(SKETCH1_4_R)
    extrude(amount=CUT_EXTRUDE5_DEPTH, mode=Mode.SUBTRACT)

    # Cut-Extrude6: up to this face of the body (flat: up to its plane)
    cut_extrude6_end = Plane(part.part.faces().sort_by_distance((-2.658998626, -13.766288966, 49.5))[0])
    # Sketch5 → Cut-Extrude6 (cut, up to the picked face)
    with BuildSketch(Plane.XY.offset(57), mode=Mode.PRIVATE) as cut_extrude6_sk1:
        with Locations((0, 11.375)):
            Rectangle(SKETCH5_W, SKETCH5_H)
    cut_extrude6_tool1 = split(extrude(cut_extrude6_sk1.sketch, amount=-CUT_EXTRUDE6_REACH, mode=Mode.PRIVATE), bisect_by=cut_extrude6_end, keep=Keep.BOTH, mode=Mode.PRIVATE)
    # Sketch5 → Cut-Extrude6 (cut, up to the picked face)
    with BuildSketch(Plane.XY.offset(57), mode=Mode.PRIVATE) as cut_extrude6_sk2:
        with Locations((11.375, 0)):
            Rectangle(SKETCH5_W_2, SKETCH5_H_2)
    cut_extrude6_tool2 = split(extrude(cut_extrude6_sk2.sketch, amount=-CUT_EXTRUDE6_REACH, mode=Mode.PRIVATE), bisect_by=cut_extrude6_end, keep=Keep.BOTH, mode=Mode.PRIVATE)
    # Sketch5 → Cut-Extrude6 (cut, up to the picked face)
    with BuildSketch(Plane.XY.offset(57), mode=Mode.PRIVATE) as cut_extrude6_sk3:
        with Locations((0, -11.375)):
            Rectangle(SKETCH5_W, SKETCH5_H)
    cut_extrude6_tool3 = split(extrude(cut_extrude6_sk3.sketch, amount=-CUT_EXTRUDE6_REACH, mode=Mode.PRIVATE), bisect_by=cut_extrude6_end, keep=Keep.BOTH, mode=Mode.PRIVATE)
    # Sketch5 → Cut-Extrude6 (cut, up to the picked face)
    with BuildSketch(Plane.XY.offset(57), mode=Mode.PRIVATE) as cut_extrude6_sk4:
        with Locations((-11.375, 0)):
            Rectangle(SKETCH5_W_2, SKETCH5_H_2)
    cut_extrude6_tool4 = split(extrude(cut_extrude6_sk4.sketch, amount=-CUT_EXTRUDE6_REACH, mode=Mode.PRIVATE), bisect_by=cut_extrude6_end, keep=Keep.BOTH, mode=Mode.PRIVATE)
    add(cut_extrude6_tool1.solids().sort_by(Axis((0, 11.375, 57), (0, 0, -1)))[0], mode=Mode.SUBTRACT)
    add(cut_extrude6_tool2.solids().sort_by(Axis((11.375, 0, 57), (0, 0, -1)))[0], mode=Mode.SUBTRACT)
    add(cut_extrude6_tool3.solids().sort_by(Axis((0, -11.375, 57), (0, 0, -1)))[0], mode=Mode.SUBTRACT)
    add(cut_extrude6_tool4.solids().sort_by(Axis((-11.375, 0, 57), (0, 0, -1)))[0], mode=Mode.SUBTRACT)


solid = part.part
